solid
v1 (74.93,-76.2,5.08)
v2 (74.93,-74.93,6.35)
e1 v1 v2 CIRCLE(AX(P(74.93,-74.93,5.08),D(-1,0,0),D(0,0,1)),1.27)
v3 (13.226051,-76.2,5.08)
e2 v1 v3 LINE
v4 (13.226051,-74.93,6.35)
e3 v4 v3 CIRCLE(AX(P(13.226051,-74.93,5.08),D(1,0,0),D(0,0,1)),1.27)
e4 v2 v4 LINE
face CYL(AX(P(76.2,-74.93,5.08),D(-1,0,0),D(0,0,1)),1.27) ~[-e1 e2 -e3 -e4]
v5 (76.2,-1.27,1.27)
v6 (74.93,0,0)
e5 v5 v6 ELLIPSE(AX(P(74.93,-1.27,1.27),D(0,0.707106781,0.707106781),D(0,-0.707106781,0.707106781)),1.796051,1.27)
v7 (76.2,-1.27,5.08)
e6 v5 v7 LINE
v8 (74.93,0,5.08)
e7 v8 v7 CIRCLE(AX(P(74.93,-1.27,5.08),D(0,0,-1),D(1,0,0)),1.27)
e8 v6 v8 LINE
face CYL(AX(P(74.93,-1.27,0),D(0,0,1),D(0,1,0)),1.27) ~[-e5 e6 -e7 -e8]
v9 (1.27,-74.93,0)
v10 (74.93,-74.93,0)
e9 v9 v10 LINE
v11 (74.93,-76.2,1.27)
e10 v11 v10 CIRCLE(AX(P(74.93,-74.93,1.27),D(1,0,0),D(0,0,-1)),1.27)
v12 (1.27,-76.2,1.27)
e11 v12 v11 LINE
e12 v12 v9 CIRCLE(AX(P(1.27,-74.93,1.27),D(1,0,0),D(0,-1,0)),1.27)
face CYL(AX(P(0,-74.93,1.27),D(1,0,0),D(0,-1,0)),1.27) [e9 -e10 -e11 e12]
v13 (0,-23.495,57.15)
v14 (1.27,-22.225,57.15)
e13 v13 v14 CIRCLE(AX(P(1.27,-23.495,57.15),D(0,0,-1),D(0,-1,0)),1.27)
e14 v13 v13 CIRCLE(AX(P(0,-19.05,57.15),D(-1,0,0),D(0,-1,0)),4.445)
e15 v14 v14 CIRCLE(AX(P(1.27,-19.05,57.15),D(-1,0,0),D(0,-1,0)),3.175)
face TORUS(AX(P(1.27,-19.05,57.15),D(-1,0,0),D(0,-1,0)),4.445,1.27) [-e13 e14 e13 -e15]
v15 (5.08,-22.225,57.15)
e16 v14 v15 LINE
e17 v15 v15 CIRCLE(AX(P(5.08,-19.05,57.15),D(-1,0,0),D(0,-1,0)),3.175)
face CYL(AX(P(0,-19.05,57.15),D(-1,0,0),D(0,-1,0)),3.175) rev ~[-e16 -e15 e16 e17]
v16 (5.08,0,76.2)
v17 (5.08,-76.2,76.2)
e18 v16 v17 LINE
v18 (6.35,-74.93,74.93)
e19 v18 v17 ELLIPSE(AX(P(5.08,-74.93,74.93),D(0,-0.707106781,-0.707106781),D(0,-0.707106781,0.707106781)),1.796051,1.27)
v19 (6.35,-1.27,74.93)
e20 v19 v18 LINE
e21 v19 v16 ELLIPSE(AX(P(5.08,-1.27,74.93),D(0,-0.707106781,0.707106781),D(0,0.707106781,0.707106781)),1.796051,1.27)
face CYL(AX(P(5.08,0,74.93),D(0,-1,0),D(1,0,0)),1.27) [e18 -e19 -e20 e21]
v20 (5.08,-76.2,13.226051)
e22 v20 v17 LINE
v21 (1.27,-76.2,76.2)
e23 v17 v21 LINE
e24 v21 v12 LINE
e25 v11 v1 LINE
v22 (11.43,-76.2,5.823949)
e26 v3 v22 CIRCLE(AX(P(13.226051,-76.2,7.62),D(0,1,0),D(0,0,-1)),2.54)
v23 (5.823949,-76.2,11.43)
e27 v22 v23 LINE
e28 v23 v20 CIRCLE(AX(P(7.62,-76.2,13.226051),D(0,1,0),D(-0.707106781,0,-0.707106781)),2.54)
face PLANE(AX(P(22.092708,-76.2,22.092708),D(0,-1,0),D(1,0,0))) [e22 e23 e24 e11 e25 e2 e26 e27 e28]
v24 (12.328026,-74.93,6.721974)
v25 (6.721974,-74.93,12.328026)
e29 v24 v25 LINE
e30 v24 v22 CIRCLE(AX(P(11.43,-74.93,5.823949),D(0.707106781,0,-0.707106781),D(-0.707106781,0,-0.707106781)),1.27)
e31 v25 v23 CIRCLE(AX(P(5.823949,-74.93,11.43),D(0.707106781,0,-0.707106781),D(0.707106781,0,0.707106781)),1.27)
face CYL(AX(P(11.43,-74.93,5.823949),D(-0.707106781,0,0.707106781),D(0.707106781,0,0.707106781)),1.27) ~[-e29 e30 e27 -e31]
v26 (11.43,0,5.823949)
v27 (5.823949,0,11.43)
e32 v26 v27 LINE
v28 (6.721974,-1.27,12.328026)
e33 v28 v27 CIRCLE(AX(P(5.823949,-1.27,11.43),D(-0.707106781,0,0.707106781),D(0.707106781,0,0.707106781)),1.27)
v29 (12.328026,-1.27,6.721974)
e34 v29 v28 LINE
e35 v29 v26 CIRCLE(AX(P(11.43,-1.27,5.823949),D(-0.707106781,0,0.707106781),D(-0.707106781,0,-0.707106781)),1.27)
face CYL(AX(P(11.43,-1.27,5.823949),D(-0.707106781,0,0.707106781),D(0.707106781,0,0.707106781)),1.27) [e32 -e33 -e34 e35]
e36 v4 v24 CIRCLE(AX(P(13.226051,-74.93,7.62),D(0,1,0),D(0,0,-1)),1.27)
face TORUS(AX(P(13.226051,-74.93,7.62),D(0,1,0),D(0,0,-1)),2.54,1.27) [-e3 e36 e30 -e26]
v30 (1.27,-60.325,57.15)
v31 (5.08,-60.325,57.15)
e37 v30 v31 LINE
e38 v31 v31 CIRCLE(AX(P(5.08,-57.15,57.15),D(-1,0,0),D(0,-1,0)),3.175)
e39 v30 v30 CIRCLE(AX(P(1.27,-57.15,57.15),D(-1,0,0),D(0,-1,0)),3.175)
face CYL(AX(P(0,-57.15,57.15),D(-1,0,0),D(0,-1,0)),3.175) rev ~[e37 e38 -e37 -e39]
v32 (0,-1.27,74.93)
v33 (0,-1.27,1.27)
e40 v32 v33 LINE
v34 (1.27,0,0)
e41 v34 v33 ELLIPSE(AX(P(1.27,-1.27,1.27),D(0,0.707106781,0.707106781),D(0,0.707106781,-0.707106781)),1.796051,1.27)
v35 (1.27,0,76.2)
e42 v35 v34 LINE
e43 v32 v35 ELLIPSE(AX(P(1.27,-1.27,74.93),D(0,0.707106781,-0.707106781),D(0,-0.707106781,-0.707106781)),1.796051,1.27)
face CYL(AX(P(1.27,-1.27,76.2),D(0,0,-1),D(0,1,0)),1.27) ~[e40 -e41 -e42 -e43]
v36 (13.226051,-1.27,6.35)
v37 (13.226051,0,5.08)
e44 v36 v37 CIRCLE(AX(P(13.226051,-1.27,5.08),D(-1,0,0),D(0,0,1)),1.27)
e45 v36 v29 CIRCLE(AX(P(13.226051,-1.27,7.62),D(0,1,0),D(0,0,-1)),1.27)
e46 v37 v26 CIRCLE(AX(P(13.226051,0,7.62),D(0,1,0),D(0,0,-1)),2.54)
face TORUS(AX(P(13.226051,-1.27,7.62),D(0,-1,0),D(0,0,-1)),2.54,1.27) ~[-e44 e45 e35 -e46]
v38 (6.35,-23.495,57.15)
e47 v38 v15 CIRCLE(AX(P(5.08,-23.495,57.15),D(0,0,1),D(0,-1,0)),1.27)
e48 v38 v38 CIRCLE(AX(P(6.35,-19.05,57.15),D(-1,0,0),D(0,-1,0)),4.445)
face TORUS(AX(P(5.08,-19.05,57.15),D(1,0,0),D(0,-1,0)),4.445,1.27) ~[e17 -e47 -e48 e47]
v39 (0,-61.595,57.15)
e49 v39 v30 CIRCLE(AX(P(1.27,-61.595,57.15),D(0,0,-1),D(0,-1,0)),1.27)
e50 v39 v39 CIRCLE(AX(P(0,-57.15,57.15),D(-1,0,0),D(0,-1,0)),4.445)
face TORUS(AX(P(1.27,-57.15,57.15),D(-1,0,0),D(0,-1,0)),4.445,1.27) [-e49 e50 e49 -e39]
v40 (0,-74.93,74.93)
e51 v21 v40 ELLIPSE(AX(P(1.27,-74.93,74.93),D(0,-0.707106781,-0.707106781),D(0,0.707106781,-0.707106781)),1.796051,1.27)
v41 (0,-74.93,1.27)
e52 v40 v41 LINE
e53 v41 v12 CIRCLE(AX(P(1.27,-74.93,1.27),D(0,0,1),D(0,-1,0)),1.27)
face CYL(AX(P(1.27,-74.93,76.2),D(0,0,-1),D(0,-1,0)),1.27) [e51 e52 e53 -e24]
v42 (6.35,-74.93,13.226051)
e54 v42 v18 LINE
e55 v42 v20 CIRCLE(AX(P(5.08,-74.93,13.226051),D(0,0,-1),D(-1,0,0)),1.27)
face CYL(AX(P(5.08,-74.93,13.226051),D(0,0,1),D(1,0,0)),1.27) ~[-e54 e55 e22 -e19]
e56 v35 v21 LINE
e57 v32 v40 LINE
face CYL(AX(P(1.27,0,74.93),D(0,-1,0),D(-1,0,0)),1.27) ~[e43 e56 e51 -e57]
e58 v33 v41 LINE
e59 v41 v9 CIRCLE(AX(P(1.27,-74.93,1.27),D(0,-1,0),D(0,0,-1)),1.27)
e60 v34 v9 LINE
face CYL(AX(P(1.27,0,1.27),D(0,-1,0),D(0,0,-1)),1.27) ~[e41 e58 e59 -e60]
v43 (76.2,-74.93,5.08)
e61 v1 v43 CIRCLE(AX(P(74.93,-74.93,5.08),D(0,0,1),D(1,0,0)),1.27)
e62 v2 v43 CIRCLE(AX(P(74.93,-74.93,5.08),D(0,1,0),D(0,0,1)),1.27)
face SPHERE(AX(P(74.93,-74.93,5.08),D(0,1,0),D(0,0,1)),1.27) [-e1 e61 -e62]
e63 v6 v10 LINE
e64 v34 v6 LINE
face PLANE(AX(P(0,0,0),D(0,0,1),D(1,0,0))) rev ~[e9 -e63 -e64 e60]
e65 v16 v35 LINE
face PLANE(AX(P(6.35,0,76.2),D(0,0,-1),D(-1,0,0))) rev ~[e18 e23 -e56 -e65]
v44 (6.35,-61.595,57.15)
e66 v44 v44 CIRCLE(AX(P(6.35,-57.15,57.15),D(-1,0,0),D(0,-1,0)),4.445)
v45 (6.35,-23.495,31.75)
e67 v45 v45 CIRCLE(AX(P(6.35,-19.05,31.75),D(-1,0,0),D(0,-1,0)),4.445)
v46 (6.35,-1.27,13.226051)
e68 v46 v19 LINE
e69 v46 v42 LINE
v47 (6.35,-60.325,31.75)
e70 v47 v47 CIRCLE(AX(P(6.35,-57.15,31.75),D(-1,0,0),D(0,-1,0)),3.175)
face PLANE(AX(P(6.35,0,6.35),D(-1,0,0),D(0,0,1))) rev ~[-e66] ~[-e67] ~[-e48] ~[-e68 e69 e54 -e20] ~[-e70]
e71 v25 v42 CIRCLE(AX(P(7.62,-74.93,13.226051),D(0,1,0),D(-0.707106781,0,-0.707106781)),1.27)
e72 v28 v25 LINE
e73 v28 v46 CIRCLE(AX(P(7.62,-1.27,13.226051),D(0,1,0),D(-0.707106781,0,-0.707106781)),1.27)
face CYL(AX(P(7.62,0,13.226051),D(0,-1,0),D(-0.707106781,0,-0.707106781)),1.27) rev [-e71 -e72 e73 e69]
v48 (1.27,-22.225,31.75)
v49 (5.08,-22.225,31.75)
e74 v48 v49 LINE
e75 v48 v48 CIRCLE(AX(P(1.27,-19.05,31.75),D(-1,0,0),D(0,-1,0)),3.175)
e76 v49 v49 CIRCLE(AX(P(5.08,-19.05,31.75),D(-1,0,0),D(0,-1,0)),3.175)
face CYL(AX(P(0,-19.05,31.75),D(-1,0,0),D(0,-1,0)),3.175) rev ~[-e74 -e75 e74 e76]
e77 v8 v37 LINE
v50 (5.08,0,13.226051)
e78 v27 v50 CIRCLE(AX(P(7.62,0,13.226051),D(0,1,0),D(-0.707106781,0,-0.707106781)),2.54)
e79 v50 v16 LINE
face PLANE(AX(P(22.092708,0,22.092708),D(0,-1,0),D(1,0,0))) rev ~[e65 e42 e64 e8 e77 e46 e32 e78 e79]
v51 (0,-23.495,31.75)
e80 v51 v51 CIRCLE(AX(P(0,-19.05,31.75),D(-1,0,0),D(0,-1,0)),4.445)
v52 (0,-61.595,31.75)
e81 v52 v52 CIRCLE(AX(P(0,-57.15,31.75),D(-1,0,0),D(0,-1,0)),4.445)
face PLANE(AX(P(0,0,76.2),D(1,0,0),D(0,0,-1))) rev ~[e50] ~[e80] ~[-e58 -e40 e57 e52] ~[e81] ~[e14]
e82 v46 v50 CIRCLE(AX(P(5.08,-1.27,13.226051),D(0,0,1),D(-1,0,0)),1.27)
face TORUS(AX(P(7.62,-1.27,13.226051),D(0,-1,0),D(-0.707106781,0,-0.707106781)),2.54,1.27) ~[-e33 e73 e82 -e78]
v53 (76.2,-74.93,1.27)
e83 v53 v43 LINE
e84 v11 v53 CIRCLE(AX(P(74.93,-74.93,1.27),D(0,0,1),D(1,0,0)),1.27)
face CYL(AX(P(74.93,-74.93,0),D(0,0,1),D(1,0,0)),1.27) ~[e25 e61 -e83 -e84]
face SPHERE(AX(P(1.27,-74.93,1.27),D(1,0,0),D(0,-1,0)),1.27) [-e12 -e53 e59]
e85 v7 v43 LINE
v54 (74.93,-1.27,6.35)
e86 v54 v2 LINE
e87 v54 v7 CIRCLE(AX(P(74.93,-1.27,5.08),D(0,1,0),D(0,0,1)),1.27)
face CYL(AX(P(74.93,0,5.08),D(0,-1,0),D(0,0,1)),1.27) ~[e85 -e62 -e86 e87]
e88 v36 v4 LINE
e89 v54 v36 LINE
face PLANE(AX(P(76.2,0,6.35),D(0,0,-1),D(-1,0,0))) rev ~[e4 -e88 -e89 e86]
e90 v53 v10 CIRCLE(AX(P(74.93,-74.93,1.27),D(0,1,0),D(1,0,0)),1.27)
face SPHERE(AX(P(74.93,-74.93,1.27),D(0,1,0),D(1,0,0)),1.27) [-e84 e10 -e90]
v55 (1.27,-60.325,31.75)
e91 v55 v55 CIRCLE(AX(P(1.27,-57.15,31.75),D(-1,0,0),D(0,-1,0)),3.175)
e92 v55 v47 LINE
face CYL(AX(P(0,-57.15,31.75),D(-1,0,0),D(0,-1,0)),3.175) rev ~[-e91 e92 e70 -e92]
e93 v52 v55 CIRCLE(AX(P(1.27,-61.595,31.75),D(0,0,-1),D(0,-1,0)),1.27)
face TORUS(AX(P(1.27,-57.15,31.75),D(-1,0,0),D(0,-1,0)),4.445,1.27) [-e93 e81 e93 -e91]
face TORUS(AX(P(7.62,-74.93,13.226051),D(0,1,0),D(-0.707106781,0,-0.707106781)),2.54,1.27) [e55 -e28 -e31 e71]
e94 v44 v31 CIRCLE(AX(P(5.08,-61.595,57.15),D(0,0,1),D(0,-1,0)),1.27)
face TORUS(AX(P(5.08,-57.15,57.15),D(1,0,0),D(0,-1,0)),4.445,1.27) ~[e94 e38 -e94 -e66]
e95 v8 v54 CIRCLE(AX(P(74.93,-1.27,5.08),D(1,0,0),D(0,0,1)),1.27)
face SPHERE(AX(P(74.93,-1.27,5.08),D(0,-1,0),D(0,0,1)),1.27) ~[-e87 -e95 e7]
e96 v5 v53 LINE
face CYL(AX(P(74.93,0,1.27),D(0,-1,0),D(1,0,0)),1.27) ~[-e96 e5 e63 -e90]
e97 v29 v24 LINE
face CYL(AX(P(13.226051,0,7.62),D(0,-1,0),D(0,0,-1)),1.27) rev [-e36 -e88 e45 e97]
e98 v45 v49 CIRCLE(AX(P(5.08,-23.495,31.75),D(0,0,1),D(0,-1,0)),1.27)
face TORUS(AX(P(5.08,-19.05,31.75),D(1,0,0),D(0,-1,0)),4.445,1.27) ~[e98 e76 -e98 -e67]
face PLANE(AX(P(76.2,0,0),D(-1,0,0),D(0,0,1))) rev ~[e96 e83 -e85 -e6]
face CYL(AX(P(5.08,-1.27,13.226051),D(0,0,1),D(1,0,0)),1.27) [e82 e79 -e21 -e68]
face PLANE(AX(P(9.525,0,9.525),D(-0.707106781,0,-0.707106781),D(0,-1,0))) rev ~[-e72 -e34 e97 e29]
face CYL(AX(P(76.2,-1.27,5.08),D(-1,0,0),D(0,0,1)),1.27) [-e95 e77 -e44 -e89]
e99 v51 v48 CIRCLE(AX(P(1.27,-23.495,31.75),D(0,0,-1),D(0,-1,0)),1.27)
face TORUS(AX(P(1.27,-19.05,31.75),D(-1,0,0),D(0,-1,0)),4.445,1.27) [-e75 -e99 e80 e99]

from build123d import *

# Parameters (mm, degrees)
F1_DEPTH = 76.2
F2_SIZE  = 6.35
F4_R     = 3.175
F5_DEPTH = 76.201
F6_F1_R  = 1.27
F6_F2_R  = 1.27


with BuildPart() as f1:
    # F0 (on Front) → F1 (new body)
    with BuildSketch(Plane.XZ):
        Polygon((0, 76.2), (0, 0), (76.2, 0), (76.2, 6.35), (6.35, 6.35), (6.35, 76.2), align=None)
    extrude(amount=F1_DEPTH)

    # F2
    f2_edges = [f1.edges().sort_by_distance(p)[0] for p in [
        (6.35, -38.1, 6.35),
    ]]
    chamfer(f2_edges, length=F2_SIZE)

    # F4 (on offset) → F5 (cut, through all)
    with BuildSketch(Plane(origin=(0, 0, 0), x_dir=(0, -1, 0), z_dir=(-1, 0, 0))):
        with Locations((19.05, 57.15)):
            Circle(F4_R)
        with Locations((19.05, 31.75)):
            Circle(F4_R)
        with Locations((57.15, 31.75)):
            Circle(F4_R)
        with Locations((57.15, 57.15)):
            Circle(F4_R)
    extrude(amount=-F5_DEPTH, mode=Mode.SUBTRACT)

    # F6: fillet of radius 1.27 on 23 edges, made by hand

    # F6_f1
    f6_f1_edges = [f1.edges().sort_by_distance(p)[0] for p in [
        (6.35, -38.1, 12.7),
        (12.7, -38.1, 6.35),
    ]]
    fillet(f6_f1_edges, radius=F6_F1_R)

    # F6_f2
    f6_f2_edges = [f1.edges().sort_by_distance(p)[0] for p in [
        (6.35, -53.975, 57.15),
        (6.35, -15.875, 57.15),
        (0, -53.975, 31.75),
        (6.35, -15.875, 31.75),
        (76.2, -38.1, 6.35),
        (44.7130256121, -76.2, 6.35),
        (44.7130256121, 0, 6.35),
        (6.35, 0, 44.7130256121),
        (6.35, -76.2, 44.7130256121),
        (6.35, -38.1, 76.2),
        (76.2, -38.1, 0),
        (76.2, -76.2, 3.175),
        (76.2, 0, 3.175),
        (38.1, -76.2, 0),
        (0, -76.2, 38.1),
        (0, -15.875, 57.15),
        (0, -53.975, 57.15),
        (0, -15.875, 31.75),
        (0, -38.1, 76.2),
        (0, 0, 38.1),
        (0, -38.1, 0),
        (6.4466729937, -76.2, 12.7400432651),
        (6.4466729937, 0, 12.7400432651),
        (12.7400432651, 0, 6.4466729937),
        (12.7400432651, -76.2, 6.4466729937),
    ]]
    fillet(f6_f2_edges, radius=F6_F2_R)


solid = f1.part
